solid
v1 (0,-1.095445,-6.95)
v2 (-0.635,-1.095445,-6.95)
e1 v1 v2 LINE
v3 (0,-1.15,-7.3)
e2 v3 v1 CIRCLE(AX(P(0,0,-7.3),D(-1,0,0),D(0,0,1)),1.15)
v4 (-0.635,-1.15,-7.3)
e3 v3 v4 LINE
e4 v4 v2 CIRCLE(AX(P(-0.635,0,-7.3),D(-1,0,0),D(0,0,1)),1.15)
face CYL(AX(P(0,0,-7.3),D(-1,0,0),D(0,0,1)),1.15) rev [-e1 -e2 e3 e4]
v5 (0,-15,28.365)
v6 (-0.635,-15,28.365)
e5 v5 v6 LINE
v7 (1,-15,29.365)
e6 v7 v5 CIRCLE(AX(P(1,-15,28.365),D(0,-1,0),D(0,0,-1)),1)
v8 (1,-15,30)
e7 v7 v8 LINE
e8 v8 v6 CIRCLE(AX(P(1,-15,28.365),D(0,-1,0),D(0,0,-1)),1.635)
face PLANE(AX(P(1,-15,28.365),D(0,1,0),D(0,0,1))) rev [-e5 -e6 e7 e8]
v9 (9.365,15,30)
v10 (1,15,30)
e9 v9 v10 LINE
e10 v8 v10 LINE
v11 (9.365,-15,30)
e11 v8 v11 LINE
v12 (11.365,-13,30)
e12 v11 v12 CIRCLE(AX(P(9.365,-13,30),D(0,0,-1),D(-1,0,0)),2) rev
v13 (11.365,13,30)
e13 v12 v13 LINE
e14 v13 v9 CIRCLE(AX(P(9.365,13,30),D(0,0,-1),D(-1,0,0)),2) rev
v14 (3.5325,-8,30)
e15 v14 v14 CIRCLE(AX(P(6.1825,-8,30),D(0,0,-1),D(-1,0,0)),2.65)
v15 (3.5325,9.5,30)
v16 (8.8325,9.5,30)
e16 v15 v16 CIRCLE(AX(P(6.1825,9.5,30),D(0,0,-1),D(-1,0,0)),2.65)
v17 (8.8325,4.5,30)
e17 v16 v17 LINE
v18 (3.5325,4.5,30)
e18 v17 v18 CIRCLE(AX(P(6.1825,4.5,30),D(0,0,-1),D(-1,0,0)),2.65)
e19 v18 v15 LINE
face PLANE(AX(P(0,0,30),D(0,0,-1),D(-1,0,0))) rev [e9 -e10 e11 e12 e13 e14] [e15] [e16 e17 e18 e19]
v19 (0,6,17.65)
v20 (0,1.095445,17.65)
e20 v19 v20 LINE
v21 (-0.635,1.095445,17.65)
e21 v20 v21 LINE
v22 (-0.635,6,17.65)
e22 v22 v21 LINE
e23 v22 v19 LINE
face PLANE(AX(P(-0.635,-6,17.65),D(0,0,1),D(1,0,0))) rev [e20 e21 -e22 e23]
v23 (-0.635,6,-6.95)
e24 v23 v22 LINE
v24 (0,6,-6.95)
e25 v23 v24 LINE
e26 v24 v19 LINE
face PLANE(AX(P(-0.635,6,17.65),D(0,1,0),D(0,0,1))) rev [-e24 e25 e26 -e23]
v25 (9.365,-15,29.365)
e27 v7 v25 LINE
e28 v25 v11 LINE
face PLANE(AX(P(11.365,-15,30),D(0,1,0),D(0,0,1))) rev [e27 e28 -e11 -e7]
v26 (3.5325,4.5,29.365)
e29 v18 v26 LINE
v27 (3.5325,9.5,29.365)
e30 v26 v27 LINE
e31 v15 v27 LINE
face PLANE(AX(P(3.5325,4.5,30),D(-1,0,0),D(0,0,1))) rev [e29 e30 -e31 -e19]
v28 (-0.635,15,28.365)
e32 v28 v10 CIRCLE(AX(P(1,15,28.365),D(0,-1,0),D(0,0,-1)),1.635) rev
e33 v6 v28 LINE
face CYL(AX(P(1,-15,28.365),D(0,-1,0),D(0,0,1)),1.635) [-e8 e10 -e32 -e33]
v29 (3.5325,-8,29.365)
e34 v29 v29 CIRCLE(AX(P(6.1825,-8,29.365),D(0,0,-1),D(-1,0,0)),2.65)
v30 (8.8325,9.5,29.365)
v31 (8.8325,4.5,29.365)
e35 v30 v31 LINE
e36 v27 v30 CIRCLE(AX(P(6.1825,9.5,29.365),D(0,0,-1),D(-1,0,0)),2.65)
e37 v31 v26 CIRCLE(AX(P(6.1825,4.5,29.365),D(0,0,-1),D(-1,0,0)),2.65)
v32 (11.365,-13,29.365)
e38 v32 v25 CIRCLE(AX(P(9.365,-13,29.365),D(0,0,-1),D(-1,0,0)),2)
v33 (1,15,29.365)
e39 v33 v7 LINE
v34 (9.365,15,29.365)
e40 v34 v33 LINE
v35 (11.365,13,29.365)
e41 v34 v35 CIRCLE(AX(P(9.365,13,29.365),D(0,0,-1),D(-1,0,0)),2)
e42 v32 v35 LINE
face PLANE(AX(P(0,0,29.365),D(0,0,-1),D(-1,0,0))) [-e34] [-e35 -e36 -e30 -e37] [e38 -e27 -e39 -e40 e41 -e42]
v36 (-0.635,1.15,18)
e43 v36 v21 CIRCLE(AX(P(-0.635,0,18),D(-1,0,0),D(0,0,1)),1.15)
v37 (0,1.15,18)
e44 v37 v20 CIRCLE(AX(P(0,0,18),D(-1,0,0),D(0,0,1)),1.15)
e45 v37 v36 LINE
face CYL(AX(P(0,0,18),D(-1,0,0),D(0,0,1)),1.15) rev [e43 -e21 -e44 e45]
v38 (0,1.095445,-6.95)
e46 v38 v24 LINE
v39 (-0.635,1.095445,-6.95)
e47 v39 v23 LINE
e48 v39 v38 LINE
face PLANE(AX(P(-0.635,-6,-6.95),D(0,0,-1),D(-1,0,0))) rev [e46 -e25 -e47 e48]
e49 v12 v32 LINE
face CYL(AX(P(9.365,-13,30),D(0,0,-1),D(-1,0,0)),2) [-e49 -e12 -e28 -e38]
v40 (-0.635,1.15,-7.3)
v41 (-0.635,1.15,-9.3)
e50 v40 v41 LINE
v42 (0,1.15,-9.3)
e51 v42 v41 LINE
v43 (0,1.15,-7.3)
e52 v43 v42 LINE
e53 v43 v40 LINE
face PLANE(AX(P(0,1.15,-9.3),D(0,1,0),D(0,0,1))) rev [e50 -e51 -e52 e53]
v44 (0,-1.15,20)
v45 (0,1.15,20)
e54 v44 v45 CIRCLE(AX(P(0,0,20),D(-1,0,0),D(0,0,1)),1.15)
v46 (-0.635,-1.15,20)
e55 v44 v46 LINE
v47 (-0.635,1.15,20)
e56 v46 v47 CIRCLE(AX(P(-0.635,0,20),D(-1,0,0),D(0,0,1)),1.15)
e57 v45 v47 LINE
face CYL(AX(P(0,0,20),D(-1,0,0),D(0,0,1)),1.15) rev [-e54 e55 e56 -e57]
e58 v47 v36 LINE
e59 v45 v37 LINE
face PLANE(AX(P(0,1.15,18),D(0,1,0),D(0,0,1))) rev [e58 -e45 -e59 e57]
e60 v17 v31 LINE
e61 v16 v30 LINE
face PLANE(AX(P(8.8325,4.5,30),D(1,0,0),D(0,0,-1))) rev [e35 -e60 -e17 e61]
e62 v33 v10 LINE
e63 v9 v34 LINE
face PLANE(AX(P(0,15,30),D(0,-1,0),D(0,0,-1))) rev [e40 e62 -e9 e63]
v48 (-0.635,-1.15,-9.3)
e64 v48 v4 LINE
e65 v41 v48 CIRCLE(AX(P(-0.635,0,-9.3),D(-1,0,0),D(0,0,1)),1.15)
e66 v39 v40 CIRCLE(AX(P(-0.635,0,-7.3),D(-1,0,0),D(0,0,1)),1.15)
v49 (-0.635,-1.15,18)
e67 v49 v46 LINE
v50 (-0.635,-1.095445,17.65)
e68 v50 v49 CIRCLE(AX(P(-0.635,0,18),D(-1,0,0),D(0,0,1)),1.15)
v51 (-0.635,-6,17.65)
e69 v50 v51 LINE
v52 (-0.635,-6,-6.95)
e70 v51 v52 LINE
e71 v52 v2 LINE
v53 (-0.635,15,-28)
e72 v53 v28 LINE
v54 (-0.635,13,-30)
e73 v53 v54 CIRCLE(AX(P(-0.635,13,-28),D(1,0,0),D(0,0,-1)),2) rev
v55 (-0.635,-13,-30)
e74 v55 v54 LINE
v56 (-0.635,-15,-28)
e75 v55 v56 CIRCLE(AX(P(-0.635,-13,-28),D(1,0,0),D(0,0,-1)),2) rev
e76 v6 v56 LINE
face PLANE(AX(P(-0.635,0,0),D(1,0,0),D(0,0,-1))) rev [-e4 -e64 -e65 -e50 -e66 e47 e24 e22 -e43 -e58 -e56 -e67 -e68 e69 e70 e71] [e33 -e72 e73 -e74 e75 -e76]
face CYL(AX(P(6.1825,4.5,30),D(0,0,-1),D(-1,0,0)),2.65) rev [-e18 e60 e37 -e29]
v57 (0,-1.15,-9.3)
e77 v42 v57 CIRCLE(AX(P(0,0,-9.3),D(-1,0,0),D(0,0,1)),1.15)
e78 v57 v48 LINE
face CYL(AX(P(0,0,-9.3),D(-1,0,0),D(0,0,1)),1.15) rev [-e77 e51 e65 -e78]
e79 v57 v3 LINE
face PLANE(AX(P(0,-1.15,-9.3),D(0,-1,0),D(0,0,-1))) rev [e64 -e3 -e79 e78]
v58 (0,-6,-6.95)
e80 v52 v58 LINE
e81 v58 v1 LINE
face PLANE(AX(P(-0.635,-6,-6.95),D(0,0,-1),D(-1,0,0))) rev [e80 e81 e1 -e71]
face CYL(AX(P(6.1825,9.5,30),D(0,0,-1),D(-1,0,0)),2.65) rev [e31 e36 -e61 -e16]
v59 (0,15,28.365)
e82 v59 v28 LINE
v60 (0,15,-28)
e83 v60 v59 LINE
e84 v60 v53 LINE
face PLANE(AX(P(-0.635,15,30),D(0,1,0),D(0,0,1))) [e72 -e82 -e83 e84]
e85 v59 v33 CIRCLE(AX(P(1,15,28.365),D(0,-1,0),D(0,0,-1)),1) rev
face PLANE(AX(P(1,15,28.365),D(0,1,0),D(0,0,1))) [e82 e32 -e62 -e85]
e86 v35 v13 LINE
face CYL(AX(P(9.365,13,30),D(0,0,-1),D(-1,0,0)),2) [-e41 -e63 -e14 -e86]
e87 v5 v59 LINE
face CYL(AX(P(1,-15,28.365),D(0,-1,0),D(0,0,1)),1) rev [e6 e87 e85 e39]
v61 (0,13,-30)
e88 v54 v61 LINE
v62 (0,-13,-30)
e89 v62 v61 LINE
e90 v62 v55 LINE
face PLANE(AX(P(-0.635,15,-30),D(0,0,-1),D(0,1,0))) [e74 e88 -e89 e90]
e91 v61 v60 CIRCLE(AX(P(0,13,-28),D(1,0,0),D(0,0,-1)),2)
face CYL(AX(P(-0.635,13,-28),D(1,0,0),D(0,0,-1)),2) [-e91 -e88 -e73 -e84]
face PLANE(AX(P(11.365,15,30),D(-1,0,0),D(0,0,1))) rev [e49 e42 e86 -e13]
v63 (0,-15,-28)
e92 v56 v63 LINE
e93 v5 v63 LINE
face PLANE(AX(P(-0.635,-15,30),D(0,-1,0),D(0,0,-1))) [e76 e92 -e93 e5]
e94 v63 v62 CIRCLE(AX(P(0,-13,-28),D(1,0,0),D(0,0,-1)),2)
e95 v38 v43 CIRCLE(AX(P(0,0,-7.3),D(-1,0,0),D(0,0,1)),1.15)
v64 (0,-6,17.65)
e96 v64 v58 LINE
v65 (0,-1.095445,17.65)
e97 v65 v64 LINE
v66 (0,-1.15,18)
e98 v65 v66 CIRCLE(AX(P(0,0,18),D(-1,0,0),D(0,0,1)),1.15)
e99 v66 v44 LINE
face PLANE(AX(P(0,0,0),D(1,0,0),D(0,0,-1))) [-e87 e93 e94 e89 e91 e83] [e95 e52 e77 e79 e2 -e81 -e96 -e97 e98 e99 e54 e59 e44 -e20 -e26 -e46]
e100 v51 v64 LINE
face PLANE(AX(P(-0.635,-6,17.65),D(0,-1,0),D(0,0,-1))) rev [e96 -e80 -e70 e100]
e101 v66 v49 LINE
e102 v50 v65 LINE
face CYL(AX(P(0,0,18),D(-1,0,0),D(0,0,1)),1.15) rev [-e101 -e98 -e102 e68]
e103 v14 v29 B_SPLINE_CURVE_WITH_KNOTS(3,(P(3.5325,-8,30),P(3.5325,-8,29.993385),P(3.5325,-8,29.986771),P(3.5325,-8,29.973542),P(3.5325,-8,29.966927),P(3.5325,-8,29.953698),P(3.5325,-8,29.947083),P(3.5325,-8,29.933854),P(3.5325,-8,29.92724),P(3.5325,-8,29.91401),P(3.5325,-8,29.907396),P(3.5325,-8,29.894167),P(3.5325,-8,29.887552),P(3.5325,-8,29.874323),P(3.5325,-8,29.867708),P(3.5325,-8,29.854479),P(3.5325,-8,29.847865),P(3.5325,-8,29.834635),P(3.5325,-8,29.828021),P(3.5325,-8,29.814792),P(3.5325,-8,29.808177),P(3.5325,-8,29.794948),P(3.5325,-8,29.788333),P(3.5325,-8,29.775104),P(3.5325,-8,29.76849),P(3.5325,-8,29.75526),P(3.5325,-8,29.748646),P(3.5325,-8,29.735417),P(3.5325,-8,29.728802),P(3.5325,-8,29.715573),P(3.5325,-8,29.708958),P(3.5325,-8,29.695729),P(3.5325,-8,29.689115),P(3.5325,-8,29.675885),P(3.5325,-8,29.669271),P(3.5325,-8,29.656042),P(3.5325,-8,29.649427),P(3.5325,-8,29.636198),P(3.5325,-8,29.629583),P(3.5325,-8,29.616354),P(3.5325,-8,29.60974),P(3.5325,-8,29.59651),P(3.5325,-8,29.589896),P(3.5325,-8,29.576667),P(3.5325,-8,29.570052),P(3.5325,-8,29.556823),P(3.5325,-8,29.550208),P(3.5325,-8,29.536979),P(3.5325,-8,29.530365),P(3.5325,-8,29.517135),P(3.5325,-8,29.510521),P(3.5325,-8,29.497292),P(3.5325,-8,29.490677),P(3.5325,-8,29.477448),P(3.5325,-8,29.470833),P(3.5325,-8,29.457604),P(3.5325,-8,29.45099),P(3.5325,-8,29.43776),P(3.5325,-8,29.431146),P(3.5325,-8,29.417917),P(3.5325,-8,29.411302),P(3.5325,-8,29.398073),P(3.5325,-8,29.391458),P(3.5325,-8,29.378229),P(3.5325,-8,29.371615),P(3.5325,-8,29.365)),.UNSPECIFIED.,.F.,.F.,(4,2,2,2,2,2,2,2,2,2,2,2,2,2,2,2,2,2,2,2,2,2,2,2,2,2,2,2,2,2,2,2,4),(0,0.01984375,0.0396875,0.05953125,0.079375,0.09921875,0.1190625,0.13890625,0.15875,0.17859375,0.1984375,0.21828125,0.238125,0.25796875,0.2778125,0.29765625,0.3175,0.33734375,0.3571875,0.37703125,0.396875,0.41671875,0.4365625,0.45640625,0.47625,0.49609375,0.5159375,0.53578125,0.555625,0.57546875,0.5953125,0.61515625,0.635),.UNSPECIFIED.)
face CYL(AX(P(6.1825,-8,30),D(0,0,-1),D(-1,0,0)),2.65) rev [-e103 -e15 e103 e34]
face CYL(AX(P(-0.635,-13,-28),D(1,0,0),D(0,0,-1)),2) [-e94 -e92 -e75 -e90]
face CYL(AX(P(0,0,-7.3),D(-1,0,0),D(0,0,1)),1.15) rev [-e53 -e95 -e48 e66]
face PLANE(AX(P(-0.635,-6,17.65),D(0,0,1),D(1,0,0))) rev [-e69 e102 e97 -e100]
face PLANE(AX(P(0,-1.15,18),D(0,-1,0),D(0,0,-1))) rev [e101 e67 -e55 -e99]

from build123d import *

# Parameters (mm, degrees)
SKETCH1_W                    = 60
SKETCH1_H                    = 30
BASE_FLANGE1_DEPTH           = 0.635
SKETCH9_W                    = 24.6
SKETCH9_H                    = 12
CUT_EXTRUDE1_DEPTH           = 34.547030047
CUT_EXTRUDE2_DEPTH           = 34.547030047
EDGE_FLANGE1_STRIP_W         = 4.54
EDGE_FLANGE1_STRIP_H         = 0.635
EDGE_FLANGE1_STRIP_CUT_DEPTH = 30
EDGE_FLANGE1_DEPTH           = 30
SKETCH14_R                   = 2.65
CUT_EXTRUDE3_DEPTH           = 63.276532097
FILLET1_R                    = 2


# Sheet-metal steps are written as plain solids
with BuildPart() as part:
    # Sketch1 → Base-Flange1 (new body)
    with BuildSketch(Plane(origin=(0, 0, 0), x_dir=(0, 0, -1), z_dir=(1, 0, 0))):
        Rectangle(SKETCH1_W, SKETCH1_H)
    extrude(amount=-BASE_FLANGE1_DEPTH)

    # Sketch9 → Cut-Extrude1 (cut, through all)
    with BuildSketch(Plane(origin=(0, 0, 0), x_dir=(0, 0, -1), z_dir=(1, 0, 0))):
        with Locations((-5.35, 0)):
            Rectangle(SKETCH9_W, SKETCH9_H)
    extrude(amount=-CUT_EXTRUDE1_DEPTH, mode=Mode.SUBTRACT)

    # Sketch10 → Cut-Extrude2 (cut, through all)
    with BuildSketch(Plane.ZY.offset(0.635)):
        with BuildLine():
            Line((-9.3, 1.15), (-7.3, 1.15))
            ThreePointArc((-7.3, 1.15), (-6.15, 0), (-7.3, -1.15))
            Line((-7.3, -1.15), (-9.3, -1.15))
            ThreePointArc((-9.3, -1.15), (-10.45, 0), (-9.3, 1.15))
        make_face()
        with BuildLine():
            Line((18, 1.15), (20, 1.15))
            ThreePointArc((20, 1.15), (21.15, 0), (20, -1.15))
            Line((20, -1.15), (18, -1.15))
            ThreePointArc((18, -1.15), (16.85, 0), (18, 1.15))
        make_face()
    extrude(amount=-CUT_EXTRUDE2_DEPTH, mode=Mode.SUBTRACT)

    # Edge-Flange1 strip (across the edge) → Edge-Flange1 strip cut (cut)
    with BuildSketch(Plane(origin=(0, 15, 30), x_dir=(0, 0, -1), z_dir=(0, -1, 0))):
        with Locations((-0.635, -0.3175)):
            Rectangle(EDGE_FLANGE1_STRIP_W, EDGE_FLANGE1_STRIP_H)
    extrude(amount=EDGE_FLANGE1_STRIP_CUT_DEPTH, mode=Mode.SUBTRACT)

    # Edge-Flange1 section (across the edge) → Edge-Flange1 (add)
    with BuildSketch(Plane(origin=(0, 15, 30), x_dir=(0, 0, -1), z_dir=(0, -1, 0))):
        with BuildLine():
            Line((0, 1), (0, 11.365))
            Line((0, 11.365), (0.635, 11.365))
            Line((0.635, 11.365), (0.635, 1))
            ThreePointArc((0.635, 1), (0.927893219, 0.292893219), (1.635, 0))
            Line((1.635, 0), (1.635, -0.635))
            ThreePointArc((1.635, -0.635), (0.478880413, -0.156119587), (0, 1))
        make_face()
    extrude(amount=EDGE_FLANGE1_DEPTH)

    # Sketch14 → Cut-Extrude3 (cut, through all)
    with BuildSketch(Plane(origin=(0, 0, 29.365), x_dir=(-1, 0, 0), z_dir=(0, 0, -1))):
        with Locations((-6.1825, -8)):
            Circle(SKETCH14_R)
        with BuildLine():
            Line((-8.8325, 4.5), (-8.8325, 9.5))
            ThreePointArc((-8.8325, 9.5), (-6.1825, 12.15), (-3.5325, 9.5))
            Line((-3.5325, 9.5), (-3.5325, 4.5))
            ThreePointArc((-3.5325, 4.5), (-6.1825, 1.85), (-8.8325, 4.5))
        make_face()
    extrude(amount=-CUT_EXTRUDE3_DEPTH, mode=Mode.SUBTRACT)

    # Fillet1
    fillet1_edges = [part.edges().sort_by_distance(p)[0] for p in [
        (11.365, 15, 29.6825),
        (11.365, -15, 29.6825),
        (-0.3175, -15, -30),
        (-0.3175, 15, -30),
    ]]
    fillet(fillet1_edges, radius=FILLET1_R)


solid = part.part
